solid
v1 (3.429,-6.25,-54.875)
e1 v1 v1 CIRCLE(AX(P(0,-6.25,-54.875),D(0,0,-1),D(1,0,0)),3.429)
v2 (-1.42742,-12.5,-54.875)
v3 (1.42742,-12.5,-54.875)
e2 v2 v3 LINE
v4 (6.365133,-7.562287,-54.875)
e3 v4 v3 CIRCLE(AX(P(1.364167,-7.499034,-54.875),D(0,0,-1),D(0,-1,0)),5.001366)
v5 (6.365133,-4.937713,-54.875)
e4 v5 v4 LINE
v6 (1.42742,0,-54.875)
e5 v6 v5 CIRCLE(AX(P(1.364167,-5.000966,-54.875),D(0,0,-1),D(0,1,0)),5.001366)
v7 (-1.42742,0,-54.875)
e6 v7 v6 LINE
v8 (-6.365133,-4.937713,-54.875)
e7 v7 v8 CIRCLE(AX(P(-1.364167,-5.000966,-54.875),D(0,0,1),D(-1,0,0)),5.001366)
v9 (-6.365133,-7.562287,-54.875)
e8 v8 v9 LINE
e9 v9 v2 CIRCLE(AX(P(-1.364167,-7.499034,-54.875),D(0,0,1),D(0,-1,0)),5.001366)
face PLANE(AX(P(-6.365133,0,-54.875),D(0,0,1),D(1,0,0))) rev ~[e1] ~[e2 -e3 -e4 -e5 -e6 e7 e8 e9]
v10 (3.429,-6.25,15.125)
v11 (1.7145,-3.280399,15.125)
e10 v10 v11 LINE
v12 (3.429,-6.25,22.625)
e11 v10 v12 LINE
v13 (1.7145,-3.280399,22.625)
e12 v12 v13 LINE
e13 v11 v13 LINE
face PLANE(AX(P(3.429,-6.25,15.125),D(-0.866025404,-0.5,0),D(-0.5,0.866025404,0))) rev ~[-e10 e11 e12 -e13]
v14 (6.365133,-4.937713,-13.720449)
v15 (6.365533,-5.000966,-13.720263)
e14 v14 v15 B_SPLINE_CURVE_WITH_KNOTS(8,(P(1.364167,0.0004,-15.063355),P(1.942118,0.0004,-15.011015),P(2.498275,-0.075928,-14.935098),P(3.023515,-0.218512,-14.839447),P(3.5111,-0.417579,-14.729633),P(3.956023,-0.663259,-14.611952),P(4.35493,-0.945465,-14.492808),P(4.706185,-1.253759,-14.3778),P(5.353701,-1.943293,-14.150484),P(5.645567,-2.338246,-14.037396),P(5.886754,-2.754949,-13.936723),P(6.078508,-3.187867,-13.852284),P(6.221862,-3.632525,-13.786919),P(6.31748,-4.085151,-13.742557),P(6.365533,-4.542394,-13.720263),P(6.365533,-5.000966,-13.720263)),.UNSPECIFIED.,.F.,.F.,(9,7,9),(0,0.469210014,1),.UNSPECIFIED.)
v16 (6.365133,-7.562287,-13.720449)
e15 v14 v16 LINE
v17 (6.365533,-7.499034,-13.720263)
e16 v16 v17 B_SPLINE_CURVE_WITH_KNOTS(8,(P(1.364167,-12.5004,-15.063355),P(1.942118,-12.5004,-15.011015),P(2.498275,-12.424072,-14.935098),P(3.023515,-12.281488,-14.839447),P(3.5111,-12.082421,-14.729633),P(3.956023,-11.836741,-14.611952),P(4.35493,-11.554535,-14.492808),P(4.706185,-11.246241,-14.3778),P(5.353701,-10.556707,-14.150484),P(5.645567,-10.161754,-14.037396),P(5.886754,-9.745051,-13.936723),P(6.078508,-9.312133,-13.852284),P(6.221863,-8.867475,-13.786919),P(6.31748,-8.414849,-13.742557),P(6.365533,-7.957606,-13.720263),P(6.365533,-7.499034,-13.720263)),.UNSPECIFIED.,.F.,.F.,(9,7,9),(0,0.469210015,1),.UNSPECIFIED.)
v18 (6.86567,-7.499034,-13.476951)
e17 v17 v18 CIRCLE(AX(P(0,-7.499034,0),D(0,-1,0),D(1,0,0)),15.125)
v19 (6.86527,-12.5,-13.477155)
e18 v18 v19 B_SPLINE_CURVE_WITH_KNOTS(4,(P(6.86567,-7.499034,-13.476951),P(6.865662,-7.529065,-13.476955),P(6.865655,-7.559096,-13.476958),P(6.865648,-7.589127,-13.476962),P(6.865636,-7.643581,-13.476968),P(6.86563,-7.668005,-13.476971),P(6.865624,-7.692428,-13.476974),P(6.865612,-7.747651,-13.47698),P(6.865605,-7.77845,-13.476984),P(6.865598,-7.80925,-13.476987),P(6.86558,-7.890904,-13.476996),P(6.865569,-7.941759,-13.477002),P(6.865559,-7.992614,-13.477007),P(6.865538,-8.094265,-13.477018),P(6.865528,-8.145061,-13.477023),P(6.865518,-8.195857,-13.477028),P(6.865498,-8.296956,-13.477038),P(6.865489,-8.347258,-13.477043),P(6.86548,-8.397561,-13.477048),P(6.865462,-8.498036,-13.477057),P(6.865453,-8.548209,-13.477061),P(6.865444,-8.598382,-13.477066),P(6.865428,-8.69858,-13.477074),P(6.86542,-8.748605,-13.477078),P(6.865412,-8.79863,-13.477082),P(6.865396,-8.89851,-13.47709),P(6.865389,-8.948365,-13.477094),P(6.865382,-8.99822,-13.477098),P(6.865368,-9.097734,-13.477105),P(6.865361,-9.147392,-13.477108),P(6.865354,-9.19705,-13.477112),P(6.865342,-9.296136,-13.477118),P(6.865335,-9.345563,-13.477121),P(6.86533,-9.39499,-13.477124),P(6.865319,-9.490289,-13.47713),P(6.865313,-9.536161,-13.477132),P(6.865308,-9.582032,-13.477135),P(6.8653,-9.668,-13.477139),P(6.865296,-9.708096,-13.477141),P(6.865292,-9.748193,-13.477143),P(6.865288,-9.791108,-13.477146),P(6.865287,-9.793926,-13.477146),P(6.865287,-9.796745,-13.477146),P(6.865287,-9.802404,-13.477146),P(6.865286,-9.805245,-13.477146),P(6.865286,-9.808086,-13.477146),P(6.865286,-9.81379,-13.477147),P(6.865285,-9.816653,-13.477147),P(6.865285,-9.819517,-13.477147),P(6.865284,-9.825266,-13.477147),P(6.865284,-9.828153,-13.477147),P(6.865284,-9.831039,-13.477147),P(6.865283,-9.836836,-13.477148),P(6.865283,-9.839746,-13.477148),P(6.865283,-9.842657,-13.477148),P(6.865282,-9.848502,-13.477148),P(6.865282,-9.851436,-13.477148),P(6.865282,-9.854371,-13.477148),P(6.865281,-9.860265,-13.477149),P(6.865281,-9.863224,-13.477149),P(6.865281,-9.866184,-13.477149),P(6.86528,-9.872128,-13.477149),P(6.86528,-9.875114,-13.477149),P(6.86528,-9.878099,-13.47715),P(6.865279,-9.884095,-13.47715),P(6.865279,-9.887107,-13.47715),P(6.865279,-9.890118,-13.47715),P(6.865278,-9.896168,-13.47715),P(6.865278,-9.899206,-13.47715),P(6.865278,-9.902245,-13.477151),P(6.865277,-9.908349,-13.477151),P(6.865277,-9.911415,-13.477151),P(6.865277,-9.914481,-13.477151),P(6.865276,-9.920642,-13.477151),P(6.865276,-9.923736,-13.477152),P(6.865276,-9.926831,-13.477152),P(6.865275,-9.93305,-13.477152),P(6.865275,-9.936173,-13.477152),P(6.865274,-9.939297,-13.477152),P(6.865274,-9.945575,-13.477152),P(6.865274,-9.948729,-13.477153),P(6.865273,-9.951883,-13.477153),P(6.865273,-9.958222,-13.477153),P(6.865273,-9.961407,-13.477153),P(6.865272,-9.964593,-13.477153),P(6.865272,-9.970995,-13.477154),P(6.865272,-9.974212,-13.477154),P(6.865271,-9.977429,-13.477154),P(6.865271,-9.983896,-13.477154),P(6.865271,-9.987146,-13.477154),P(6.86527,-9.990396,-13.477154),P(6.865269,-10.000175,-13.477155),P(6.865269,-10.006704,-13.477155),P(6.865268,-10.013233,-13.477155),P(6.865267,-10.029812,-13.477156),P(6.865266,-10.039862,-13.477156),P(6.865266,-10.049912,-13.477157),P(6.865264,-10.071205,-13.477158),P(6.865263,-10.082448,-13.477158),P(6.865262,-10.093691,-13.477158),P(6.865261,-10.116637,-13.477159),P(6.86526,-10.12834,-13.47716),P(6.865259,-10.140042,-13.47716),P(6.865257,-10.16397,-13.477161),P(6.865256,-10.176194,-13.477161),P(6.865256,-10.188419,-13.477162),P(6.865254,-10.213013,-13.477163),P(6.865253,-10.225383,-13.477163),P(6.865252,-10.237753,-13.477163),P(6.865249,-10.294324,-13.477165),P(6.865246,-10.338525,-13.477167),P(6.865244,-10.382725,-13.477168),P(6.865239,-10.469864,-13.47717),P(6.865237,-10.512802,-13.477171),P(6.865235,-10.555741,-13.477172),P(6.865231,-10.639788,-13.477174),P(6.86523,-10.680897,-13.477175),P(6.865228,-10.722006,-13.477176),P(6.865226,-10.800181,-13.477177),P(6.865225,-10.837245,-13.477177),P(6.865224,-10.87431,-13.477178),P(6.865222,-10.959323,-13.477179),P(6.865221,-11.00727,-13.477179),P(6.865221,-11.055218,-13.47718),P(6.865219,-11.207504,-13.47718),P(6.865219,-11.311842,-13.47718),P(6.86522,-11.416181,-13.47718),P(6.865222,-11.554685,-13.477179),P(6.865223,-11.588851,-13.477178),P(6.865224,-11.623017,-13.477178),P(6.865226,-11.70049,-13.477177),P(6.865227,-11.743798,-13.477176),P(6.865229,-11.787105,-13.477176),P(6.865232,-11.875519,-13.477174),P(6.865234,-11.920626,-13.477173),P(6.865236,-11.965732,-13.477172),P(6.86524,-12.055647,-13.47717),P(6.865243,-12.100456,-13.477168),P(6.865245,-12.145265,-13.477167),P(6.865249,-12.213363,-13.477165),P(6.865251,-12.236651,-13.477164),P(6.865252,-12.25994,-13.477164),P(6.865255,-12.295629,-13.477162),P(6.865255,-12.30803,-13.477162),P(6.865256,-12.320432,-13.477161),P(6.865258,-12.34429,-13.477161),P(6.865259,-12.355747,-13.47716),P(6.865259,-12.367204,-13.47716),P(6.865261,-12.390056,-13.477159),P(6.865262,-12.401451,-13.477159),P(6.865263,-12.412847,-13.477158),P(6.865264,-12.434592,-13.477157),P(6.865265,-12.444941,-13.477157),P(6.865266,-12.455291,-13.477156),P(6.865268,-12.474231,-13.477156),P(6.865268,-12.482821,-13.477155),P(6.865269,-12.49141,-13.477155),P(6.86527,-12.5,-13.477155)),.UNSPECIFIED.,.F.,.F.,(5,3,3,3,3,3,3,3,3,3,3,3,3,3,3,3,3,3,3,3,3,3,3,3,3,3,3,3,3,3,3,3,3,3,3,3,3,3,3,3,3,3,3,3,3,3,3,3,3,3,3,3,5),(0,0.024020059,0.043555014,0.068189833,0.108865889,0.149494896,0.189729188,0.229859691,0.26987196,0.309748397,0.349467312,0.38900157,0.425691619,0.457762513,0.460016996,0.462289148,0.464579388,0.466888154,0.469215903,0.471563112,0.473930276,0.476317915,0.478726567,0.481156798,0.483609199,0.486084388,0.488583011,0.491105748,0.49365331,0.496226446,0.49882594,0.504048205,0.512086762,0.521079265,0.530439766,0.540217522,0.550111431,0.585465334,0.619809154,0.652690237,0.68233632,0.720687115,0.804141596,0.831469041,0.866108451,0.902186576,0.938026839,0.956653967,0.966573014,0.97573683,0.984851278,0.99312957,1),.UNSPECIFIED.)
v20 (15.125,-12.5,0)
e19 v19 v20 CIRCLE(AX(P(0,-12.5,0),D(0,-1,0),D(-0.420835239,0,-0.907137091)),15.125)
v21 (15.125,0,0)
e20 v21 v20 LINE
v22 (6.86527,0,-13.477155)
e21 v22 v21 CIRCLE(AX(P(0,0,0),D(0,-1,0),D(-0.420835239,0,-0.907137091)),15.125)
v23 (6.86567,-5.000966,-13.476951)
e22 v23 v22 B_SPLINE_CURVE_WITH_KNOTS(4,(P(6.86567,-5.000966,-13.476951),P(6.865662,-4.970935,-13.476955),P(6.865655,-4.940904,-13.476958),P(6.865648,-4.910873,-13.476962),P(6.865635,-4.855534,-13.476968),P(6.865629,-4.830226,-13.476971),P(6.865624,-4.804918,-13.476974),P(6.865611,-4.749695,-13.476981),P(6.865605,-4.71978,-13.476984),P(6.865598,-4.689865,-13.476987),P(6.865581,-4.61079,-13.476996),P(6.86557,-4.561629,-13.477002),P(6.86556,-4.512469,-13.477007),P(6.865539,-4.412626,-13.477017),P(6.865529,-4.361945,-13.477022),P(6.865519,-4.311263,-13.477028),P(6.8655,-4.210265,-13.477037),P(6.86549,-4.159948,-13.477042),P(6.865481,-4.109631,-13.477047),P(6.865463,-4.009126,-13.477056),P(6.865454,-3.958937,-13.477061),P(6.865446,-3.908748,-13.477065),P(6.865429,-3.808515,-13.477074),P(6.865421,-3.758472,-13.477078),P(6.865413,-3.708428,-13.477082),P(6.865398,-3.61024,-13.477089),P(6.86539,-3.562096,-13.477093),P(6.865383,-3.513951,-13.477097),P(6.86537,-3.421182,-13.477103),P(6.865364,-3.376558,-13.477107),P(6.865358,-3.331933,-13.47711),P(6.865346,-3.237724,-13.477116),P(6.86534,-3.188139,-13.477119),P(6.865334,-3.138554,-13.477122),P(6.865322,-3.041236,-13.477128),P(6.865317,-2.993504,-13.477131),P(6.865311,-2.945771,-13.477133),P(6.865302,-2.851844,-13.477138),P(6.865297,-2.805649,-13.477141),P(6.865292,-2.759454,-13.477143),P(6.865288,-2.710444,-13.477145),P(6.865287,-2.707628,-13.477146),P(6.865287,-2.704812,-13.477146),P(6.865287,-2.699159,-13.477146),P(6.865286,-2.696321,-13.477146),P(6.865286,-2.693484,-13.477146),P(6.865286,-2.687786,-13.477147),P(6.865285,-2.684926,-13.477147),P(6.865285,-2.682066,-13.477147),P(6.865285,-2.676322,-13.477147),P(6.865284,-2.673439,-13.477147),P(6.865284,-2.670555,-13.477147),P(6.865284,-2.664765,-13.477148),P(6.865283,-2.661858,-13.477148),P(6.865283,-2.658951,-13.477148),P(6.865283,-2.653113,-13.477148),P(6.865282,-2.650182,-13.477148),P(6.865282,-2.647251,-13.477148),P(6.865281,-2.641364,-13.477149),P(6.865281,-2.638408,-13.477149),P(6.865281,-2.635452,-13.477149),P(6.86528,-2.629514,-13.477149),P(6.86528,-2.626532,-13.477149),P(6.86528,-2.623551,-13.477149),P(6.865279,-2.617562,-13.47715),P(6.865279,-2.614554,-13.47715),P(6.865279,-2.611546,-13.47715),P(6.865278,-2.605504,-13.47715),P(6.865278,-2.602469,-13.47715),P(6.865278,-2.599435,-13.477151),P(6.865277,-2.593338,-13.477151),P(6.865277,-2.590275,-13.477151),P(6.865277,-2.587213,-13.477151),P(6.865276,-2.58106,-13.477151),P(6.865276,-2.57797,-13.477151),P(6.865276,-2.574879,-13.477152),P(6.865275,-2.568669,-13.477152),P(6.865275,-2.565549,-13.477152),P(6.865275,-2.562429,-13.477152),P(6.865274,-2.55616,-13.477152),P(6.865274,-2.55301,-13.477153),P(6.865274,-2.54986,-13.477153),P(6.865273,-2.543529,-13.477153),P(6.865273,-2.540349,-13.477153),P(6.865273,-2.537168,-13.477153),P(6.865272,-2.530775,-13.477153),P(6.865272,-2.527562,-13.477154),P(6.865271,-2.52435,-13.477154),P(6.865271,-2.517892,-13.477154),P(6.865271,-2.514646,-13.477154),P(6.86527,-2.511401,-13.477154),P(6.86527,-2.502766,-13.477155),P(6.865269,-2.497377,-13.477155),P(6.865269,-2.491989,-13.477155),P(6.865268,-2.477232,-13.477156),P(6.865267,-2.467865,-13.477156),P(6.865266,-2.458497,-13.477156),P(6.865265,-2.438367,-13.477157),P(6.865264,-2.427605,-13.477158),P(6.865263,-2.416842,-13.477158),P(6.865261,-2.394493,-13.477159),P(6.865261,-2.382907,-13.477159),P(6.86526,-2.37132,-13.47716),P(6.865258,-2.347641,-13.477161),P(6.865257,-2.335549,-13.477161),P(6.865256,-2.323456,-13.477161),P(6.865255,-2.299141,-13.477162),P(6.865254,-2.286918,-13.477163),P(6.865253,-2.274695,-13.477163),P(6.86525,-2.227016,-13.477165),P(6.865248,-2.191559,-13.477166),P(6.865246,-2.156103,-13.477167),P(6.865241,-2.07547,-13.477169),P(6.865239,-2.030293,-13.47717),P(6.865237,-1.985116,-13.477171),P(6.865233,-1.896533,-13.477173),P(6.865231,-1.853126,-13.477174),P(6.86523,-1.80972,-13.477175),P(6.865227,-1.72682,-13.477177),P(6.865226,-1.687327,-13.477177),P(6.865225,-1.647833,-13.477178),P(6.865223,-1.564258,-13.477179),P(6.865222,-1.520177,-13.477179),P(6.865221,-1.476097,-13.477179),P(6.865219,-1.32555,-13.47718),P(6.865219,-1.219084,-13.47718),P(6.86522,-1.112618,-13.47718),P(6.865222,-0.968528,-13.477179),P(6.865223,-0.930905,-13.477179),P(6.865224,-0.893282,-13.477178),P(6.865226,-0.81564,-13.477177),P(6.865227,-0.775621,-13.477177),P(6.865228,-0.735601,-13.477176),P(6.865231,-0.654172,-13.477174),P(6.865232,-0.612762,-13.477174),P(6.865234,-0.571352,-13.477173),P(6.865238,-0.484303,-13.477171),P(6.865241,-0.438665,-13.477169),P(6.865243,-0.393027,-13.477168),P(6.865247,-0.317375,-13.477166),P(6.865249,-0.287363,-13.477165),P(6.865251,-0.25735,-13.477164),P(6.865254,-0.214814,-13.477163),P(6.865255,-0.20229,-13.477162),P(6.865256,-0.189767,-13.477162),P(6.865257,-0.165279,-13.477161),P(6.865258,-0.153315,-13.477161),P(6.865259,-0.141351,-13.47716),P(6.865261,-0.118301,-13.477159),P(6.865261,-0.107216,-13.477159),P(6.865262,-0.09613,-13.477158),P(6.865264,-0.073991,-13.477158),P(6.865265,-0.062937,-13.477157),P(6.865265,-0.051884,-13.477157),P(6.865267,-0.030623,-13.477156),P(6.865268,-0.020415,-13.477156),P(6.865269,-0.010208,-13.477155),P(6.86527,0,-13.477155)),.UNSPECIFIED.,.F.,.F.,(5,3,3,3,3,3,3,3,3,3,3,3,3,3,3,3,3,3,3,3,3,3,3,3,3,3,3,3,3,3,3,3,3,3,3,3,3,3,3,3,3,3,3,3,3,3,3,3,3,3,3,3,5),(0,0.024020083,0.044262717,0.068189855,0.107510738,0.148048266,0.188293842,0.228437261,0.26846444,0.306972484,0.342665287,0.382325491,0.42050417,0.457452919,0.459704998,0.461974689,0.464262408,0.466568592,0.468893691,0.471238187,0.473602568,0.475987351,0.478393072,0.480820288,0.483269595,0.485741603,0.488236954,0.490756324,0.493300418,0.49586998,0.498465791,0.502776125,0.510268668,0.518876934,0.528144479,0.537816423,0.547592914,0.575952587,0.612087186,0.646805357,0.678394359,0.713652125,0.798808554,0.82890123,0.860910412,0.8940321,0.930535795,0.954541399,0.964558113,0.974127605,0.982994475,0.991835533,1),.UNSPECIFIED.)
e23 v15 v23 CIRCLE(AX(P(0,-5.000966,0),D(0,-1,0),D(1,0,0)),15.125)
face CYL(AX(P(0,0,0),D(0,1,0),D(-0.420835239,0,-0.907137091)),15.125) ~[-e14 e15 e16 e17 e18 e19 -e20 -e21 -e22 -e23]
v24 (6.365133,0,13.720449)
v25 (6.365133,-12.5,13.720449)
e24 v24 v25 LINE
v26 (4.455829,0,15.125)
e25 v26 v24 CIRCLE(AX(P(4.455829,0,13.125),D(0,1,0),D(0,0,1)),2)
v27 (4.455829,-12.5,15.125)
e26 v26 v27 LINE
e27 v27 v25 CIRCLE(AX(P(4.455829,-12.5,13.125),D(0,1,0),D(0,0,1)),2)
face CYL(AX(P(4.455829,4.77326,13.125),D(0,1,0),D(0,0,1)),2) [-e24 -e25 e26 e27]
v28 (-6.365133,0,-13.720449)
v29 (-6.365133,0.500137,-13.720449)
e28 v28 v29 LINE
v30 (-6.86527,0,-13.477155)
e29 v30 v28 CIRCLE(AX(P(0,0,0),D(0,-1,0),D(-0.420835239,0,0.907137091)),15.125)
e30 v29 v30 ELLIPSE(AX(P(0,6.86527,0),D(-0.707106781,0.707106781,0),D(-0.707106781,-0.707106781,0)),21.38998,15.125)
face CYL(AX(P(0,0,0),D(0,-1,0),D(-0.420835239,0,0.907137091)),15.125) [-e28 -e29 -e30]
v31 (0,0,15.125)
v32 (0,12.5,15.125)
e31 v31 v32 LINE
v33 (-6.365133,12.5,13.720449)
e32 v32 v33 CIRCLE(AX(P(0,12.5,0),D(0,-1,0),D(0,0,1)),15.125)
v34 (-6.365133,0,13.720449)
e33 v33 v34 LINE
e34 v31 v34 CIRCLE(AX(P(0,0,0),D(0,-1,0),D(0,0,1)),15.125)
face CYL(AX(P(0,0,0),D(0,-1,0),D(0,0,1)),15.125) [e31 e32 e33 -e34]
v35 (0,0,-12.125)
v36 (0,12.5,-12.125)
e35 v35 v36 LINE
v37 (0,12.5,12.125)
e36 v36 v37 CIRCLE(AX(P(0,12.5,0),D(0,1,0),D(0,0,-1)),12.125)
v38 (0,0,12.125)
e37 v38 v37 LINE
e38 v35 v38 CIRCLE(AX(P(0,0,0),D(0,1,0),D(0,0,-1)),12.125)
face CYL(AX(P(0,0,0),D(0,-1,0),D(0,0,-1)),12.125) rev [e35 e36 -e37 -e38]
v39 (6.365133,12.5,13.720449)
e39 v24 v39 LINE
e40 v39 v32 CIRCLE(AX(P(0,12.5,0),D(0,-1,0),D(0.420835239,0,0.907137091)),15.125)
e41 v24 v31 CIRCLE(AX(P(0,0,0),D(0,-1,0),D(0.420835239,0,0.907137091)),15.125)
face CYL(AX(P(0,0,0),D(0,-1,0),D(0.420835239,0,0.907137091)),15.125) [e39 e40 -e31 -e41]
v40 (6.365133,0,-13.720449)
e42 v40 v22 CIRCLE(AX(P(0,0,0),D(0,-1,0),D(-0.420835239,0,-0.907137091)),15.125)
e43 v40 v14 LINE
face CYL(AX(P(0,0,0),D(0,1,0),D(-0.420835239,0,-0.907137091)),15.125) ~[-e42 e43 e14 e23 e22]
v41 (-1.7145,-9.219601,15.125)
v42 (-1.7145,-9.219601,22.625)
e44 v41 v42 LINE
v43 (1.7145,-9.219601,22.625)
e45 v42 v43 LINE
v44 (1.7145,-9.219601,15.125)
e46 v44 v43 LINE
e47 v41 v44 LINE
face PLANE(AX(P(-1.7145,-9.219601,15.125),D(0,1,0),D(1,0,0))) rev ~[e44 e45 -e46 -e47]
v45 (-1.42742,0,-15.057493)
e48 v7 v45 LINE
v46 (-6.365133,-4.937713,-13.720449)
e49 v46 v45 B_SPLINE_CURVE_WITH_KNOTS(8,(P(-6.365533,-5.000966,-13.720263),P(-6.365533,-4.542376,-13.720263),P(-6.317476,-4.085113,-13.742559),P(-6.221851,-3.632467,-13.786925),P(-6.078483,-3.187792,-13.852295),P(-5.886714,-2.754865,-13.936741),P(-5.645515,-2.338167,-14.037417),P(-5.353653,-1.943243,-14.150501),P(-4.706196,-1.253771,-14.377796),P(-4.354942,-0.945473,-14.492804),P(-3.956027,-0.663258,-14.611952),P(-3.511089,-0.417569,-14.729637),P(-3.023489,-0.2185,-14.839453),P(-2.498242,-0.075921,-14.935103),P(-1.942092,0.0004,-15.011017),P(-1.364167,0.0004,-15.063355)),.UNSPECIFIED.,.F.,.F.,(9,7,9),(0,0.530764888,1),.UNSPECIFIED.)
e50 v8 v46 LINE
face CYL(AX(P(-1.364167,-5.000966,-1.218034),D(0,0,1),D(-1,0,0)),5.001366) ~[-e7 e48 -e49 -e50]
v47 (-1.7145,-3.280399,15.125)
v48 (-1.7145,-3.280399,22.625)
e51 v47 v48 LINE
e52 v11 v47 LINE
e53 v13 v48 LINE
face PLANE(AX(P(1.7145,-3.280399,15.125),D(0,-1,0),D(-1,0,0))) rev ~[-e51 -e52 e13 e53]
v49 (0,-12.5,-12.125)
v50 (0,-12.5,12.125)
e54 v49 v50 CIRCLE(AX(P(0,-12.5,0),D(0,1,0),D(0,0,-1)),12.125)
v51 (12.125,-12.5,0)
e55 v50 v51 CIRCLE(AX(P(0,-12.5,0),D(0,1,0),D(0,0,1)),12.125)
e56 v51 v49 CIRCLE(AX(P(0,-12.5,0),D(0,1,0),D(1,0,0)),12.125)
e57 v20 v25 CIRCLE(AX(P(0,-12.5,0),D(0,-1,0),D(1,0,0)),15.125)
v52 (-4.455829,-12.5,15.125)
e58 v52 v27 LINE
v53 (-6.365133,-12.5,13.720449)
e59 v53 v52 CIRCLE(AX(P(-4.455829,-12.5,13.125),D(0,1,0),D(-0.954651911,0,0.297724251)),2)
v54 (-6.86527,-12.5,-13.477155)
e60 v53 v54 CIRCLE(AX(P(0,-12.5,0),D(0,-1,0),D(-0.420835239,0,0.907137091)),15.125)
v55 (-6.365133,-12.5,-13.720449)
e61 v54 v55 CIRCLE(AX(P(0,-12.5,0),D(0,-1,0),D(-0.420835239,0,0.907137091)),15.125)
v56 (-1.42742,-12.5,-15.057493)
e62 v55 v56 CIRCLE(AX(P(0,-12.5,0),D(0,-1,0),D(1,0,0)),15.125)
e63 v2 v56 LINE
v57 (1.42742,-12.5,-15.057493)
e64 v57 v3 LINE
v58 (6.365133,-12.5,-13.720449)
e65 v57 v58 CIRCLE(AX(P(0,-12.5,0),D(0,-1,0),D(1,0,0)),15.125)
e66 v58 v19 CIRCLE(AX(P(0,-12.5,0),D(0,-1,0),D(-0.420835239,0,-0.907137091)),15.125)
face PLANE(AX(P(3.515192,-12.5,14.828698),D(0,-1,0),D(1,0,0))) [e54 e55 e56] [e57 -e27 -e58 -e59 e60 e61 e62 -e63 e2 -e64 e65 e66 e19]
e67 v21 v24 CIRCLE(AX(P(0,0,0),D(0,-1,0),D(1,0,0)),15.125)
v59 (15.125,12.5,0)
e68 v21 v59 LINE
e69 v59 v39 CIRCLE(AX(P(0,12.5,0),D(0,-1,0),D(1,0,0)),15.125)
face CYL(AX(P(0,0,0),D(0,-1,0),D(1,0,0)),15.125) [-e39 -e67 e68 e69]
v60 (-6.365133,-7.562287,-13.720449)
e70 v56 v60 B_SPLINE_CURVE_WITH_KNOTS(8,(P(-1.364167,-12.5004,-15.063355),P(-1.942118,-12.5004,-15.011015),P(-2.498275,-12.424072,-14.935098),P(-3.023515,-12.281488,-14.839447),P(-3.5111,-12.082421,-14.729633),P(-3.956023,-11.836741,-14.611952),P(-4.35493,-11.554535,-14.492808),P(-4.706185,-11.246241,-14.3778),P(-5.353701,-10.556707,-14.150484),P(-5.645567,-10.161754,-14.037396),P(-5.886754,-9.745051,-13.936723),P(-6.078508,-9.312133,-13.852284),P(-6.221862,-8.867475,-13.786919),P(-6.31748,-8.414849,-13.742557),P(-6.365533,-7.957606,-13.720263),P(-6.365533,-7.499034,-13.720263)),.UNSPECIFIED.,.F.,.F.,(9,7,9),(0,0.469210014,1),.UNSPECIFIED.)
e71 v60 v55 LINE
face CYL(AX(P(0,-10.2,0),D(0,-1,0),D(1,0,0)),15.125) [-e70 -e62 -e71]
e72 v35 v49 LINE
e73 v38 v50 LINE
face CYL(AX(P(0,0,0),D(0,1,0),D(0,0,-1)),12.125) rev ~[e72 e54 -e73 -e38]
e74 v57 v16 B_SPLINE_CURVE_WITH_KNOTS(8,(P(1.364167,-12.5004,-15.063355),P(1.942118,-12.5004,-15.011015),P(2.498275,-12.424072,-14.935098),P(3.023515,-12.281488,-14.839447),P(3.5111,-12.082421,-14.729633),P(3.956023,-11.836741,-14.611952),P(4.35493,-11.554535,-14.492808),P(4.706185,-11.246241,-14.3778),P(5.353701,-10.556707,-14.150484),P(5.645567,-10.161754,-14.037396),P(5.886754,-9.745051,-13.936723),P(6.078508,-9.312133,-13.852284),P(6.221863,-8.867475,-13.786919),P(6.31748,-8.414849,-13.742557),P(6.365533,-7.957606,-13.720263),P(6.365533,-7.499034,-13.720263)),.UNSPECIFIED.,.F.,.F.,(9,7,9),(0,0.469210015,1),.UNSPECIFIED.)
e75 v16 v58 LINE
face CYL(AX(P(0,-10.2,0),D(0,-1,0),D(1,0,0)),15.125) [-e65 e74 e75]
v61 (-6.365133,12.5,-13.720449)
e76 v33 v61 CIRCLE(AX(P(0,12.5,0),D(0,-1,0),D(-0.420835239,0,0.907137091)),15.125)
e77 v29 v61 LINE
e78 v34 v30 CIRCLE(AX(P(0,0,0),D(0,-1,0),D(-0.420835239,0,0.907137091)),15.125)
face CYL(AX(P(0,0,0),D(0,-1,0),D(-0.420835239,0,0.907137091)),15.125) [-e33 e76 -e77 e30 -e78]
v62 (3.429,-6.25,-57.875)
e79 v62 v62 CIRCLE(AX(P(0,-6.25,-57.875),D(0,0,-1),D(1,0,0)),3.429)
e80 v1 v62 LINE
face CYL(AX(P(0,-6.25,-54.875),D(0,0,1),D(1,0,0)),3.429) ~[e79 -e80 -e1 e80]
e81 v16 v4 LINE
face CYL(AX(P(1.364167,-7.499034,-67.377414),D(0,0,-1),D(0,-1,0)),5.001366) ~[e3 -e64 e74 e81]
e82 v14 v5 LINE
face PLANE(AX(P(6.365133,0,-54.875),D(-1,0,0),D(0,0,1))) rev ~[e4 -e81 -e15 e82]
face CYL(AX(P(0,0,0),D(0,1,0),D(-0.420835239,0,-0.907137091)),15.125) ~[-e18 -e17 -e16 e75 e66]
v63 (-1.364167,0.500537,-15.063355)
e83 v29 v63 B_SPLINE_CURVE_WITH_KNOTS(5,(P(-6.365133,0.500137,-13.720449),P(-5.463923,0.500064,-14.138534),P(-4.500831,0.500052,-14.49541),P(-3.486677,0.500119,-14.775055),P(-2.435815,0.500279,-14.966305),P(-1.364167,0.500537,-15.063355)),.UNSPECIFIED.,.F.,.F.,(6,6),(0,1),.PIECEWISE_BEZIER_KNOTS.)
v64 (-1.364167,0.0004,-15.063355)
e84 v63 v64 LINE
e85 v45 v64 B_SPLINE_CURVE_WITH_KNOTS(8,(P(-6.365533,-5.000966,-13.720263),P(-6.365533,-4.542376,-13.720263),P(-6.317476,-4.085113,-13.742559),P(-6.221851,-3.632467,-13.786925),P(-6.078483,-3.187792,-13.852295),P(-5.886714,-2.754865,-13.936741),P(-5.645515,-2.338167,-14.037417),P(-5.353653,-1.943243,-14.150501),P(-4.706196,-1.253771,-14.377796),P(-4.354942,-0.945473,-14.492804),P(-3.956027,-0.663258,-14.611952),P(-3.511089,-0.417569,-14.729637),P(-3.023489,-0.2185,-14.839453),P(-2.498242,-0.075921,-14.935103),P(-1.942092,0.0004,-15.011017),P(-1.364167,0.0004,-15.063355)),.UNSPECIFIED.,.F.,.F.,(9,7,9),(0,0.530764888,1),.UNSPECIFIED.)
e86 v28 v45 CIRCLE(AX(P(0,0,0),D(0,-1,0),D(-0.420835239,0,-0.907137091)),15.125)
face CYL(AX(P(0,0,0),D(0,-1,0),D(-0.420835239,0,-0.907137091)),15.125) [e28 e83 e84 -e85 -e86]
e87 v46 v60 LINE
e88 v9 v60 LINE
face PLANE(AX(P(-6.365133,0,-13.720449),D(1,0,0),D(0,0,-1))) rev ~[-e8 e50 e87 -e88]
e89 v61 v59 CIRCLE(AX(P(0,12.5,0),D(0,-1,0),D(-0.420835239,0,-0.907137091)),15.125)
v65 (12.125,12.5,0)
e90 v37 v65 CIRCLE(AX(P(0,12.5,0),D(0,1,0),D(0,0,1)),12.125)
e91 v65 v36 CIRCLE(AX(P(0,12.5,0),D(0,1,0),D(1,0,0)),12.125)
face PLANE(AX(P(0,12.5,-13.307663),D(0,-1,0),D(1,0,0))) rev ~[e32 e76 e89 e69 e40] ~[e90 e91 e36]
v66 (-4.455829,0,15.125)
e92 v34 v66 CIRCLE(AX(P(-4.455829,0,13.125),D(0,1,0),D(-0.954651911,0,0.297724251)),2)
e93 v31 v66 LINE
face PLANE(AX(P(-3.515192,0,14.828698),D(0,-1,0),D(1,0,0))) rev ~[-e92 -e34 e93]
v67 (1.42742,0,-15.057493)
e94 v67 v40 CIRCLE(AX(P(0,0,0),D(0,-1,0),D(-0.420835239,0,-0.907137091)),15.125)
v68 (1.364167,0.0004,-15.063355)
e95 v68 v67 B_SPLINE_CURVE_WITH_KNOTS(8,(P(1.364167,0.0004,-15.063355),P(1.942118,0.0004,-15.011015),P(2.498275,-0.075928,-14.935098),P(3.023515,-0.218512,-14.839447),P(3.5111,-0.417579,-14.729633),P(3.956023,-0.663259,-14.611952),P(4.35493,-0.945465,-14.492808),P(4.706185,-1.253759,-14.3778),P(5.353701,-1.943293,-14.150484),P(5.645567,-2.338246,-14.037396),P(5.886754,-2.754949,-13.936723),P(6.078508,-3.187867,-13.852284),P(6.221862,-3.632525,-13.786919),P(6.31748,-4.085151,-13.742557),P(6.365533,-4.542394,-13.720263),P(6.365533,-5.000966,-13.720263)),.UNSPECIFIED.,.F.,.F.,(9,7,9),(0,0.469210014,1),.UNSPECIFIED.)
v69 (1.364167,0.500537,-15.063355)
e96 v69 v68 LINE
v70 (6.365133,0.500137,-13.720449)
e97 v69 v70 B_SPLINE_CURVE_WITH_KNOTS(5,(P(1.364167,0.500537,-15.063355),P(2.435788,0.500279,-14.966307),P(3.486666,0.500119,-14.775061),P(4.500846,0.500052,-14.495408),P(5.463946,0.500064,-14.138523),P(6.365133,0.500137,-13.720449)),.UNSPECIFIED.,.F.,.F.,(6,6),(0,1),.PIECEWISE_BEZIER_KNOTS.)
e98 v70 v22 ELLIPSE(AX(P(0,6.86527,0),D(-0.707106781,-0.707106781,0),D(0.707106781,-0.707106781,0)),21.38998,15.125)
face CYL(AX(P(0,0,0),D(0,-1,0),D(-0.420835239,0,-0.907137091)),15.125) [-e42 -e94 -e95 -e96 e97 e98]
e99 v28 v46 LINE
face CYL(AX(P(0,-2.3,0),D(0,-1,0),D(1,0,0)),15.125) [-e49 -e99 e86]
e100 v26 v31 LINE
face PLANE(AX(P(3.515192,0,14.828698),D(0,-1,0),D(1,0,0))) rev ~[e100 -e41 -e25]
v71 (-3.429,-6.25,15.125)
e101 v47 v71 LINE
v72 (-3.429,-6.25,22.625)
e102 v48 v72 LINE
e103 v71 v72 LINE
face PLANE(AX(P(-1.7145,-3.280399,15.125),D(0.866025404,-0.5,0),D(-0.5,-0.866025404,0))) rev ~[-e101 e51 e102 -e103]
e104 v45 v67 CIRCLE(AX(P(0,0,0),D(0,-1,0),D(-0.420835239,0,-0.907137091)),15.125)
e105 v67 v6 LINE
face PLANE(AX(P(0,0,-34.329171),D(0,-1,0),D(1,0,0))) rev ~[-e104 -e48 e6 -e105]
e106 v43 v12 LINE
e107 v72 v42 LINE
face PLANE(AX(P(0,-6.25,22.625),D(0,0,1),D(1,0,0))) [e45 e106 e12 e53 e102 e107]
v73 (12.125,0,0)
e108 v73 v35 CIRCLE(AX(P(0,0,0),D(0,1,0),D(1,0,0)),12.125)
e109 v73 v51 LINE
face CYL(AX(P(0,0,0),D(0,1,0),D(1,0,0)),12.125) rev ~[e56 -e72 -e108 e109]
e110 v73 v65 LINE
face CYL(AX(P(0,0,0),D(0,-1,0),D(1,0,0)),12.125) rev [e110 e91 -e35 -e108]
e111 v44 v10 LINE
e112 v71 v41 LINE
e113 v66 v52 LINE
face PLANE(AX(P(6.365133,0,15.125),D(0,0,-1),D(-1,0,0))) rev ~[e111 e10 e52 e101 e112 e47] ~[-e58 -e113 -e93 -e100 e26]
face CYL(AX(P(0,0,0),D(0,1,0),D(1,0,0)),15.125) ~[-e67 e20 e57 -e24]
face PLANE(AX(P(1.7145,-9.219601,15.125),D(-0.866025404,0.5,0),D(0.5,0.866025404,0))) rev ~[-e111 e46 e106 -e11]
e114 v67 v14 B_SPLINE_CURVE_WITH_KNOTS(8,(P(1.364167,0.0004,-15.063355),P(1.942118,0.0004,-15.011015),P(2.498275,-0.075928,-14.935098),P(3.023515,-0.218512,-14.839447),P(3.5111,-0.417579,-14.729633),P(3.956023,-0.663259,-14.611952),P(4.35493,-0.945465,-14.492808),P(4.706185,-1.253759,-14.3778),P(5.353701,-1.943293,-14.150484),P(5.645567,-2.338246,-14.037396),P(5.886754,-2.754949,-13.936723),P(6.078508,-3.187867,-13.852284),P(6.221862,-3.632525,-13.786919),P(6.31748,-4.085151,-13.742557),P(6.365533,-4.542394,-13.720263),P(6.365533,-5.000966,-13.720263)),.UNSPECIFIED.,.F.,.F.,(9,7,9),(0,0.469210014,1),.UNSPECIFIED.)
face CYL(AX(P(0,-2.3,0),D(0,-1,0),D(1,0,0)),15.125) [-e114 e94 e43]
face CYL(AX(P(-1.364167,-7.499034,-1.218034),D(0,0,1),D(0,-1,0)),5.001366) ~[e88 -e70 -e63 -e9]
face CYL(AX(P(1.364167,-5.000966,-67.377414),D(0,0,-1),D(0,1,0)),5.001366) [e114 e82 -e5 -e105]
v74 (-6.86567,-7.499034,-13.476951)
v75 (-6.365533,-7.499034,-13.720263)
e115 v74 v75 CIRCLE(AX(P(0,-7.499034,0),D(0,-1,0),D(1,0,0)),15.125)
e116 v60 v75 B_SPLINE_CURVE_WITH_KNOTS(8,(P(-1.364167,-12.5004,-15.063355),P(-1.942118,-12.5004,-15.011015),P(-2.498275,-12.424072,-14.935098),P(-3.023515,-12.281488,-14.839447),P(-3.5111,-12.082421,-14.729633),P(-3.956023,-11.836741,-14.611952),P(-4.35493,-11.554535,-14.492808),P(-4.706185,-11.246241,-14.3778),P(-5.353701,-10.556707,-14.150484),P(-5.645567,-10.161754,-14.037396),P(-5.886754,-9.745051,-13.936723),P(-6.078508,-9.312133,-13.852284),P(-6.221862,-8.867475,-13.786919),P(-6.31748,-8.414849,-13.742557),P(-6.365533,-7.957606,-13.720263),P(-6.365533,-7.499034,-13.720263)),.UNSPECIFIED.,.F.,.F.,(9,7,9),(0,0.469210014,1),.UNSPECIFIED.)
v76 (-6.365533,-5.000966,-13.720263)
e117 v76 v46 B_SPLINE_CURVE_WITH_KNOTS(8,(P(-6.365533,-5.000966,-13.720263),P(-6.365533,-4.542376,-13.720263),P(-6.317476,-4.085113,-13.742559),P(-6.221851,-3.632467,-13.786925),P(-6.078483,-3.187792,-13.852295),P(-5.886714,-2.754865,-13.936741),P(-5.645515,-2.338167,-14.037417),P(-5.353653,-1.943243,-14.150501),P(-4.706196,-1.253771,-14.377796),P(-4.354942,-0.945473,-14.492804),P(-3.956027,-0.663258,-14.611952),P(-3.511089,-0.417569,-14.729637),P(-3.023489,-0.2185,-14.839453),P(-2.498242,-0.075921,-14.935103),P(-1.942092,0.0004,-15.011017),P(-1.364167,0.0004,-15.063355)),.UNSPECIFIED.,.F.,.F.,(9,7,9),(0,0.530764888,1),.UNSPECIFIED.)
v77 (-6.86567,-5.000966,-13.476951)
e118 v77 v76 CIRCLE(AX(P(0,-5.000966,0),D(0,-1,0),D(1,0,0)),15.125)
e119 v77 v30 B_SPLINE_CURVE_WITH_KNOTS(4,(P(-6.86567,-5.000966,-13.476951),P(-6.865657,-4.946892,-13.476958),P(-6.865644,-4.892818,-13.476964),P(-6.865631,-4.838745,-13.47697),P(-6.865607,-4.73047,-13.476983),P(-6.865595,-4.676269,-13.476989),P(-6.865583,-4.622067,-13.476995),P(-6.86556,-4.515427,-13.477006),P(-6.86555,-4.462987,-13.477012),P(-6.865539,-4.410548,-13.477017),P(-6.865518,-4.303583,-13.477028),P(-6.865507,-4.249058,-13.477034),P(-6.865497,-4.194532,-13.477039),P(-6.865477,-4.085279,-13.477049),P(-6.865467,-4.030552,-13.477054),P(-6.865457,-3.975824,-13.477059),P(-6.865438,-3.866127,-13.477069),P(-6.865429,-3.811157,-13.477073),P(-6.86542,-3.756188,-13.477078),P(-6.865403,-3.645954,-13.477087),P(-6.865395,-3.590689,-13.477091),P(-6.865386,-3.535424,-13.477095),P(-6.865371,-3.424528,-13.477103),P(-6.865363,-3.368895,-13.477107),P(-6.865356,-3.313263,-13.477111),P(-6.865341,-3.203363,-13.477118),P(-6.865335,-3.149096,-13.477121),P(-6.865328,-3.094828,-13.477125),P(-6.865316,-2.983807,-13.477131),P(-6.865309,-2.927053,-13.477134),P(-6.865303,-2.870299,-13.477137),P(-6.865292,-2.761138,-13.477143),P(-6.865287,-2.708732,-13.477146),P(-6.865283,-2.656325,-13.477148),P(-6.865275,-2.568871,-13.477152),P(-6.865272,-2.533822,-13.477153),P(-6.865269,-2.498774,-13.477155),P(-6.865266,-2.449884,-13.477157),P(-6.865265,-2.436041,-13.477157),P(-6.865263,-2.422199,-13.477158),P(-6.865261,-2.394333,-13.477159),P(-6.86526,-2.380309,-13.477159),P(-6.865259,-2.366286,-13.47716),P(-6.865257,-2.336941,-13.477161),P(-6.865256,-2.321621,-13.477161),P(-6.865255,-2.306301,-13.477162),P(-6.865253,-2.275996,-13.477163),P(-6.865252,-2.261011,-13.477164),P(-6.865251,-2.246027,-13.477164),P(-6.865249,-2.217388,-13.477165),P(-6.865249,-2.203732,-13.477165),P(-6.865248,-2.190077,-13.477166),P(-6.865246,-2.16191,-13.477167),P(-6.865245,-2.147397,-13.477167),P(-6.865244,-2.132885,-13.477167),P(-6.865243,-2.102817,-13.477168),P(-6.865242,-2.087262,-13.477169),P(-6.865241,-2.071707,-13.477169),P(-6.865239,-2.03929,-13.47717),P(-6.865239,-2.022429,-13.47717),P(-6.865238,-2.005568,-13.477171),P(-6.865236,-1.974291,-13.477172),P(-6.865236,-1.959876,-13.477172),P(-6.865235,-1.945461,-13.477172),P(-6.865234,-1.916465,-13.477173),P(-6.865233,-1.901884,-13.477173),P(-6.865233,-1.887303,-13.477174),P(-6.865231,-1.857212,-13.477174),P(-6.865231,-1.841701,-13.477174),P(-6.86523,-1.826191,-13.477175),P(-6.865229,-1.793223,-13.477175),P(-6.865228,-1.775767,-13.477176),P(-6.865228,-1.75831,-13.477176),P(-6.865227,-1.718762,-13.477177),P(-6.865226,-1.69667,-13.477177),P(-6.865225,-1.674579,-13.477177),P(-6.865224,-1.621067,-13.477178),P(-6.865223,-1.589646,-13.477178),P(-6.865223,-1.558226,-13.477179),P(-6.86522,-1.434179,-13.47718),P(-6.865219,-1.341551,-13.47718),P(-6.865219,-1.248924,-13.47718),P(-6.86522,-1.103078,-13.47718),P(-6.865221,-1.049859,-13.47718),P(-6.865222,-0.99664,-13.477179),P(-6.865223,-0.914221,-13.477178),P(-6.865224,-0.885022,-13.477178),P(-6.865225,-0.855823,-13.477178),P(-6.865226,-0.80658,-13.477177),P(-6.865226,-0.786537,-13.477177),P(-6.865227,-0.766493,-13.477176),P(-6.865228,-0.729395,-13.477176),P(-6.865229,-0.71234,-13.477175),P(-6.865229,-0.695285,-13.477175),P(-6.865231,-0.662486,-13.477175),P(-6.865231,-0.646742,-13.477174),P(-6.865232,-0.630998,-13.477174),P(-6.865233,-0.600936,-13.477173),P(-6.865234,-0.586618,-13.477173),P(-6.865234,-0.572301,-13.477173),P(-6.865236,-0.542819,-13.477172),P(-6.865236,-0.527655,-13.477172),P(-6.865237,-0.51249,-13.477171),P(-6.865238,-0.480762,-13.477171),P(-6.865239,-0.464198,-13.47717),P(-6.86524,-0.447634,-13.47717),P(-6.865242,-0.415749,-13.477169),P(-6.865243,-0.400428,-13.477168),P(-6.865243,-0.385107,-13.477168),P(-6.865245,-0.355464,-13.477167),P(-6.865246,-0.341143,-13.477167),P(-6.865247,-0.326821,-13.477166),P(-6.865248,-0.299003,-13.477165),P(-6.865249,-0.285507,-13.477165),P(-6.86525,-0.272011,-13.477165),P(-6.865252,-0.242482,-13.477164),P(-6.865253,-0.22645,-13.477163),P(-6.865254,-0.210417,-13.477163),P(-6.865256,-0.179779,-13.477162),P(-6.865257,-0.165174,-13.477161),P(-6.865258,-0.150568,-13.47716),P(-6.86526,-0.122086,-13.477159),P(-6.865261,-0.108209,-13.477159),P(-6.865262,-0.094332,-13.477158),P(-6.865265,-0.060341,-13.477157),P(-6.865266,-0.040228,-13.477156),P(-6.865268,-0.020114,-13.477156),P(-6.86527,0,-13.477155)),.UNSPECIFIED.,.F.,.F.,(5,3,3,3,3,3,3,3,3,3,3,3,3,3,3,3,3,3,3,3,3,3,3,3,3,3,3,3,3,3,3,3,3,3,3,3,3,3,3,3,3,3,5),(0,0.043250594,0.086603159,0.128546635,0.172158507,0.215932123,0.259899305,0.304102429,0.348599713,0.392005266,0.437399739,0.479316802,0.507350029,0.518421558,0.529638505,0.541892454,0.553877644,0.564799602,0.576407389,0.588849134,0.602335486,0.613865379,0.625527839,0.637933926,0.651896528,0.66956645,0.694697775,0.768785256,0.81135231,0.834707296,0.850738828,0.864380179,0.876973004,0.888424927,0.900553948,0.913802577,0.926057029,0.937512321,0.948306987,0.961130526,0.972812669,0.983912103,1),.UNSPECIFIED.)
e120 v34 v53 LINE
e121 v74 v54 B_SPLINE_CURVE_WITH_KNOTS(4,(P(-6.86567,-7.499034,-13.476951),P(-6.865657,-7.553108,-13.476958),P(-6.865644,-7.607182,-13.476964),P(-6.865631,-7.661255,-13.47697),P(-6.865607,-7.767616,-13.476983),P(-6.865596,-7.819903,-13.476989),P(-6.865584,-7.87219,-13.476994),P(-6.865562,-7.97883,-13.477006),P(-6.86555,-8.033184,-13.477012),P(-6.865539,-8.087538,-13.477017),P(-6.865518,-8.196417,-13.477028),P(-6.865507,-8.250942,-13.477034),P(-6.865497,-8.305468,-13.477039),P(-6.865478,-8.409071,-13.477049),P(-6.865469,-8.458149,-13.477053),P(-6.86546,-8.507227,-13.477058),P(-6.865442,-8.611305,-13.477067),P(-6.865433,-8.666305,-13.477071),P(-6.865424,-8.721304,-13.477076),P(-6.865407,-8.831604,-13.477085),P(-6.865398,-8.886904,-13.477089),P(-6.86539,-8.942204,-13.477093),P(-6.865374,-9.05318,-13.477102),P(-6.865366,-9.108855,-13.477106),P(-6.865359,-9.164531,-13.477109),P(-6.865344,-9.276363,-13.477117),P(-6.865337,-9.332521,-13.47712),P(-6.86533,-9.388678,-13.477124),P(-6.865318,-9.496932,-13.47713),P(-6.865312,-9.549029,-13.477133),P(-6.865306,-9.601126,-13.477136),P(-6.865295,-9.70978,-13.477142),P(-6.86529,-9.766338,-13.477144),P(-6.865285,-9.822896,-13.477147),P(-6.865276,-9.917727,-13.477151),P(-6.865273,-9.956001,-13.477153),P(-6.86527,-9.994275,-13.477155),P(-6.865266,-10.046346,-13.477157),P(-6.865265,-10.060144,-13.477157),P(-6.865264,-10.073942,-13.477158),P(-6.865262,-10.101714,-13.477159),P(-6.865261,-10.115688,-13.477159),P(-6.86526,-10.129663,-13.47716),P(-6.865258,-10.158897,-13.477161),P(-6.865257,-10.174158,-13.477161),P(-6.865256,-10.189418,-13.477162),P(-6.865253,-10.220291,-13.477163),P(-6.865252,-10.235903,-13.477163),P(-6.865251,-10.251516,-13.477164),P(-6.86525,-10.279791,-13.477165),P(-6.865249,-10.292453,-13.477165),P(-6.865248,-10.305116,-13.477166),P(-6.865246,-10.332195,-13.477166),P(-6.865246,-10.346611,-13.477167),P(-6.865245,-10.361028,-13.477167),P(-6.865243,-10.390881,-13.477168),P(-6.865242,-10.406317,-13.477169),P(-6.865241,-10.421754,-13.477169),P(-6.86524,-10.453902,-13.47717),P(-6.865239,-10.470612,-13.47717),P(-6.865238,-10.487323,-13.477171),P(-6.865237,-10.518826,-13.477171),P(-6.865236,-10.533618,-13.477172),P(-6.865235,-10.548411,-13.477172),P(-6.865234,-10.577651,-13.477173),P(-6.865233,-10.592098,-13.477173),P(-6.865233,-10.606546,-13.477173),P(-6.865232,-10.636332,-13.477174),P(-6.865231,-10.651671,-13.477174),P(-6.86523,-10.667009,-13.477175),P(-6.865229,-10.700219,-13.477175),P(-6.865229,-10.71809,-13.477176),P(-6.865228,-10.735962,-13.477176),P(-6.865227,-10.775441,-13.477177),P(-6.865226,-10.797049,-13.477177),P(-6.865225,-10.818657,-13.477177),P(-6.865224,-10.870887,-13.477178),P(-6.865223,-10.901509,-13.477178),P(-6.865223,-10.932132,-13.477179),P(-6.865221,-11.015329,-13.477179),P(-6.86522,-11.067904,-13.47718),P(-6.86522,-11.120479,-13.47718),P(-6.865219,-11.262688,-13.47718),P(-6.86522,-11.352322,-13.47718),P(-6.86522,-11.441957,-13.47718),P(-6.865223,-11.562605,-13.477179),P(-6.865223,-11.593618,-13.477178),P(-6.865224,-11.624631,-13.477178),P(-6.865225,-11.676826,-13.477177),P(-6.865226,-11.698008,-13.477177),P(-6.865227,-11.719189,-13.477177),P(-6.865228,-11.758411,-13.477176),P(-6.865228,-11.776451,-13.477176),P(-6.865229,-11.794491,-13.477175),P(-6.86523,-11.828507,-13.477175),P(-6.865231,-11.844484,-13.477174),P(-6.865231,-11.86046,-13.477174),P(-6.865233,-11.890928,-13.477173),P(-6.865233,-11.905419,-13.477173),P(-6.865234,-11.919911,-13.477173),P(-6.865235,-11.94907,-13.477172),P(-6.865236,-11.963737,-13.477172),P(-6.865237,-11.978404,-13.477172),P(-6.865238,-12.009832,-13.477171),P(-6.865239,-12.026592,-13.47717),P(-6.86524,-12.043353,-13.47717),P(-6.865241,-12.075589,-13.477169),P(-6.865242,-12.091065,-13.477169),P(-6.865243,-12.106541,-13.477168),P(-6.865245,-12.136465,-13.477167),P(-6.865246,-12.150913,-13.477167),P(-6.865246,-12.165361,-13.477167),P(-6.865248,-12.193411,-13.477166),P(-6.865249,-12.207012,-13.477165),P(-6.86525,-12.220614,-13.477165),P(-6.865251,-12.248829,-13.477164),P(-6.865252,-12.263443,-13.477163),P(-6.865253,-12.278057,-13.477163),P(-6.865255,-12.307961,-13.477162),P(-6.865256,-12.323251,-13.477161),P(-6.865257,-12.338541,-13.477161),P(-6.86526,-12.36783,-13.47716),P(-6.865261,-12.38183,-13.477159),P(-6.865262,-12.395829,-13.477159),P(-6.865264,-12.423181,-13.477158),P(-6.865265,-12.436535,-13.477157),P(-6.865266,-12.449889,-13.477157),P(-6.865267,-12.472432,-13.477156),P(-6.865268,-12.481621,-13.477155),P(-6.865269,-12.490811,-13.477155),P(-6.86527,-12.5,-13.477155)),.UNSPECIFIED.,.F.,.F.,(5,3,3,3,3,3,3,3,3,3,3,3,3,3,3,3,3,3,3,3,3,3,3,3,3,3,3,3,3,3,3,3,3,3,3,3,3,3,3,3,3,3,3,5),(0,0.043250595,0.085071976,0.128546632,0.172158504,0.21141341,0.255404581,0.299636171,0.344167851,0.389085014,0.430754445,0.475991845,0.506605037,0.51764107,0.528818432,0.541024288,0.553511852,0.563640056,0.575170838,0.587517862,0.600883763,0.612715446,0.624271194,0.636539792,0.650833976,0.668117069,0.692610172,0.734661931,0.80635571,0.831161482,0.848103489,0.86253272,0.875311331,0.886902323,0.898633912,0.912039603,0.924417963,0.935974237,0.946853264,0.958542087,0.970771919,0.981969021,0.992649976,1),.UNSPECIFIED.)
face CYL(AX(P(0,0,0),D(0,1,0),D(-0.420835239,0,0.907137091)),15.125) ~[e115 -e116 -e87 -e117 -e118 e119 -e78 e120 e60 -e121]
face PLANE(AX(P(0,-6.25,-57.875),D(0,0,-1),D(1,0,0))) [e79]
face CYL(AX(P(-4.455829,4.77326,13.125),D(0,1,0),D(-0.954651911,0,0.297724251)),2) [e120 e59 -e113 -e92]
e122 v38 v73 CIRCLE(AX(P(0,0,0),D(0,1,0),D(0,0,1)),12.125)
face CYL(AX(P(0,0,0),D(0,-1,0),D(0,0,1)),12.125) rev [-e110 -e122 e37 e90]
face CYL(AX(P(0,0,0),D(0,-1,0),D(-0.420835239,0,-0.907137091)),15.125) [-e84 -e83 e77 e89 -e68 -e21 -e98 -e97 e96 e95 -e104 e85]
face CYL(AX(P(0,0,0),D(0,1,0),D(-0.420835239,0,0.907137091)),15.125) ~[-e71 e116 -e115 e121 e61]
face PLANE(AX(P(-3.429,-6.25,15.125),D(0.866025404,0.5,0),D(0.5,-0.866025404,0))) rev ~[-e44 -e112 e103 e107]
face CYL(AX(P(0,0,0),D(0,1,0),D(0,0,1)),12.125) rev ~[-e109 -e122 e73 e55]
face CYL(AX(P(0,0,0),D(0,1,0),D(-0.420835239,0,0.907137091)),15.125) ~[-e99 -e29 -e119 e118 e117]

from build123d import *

# Parameters (mm, degrees)
F1_DEPTH     = 12.5
F2_DEPTH     = 12.5
F3_DEPTH     = 12.5
F6_DEPTH     = 7.5
F5_R         = 3.429
F7_DEPTH     = 3
F8_T4_DEPTH  = 66.159380005
F8_S5_R      = 15.125
F8_T6_DEPTH  = 35
F8_T10_DEPTH = 66.159380005
F8_S11_R     = 15.125
F8_T12_DEPTH = 35
F8_T16_DEPTH = 66.159380005
F8_S17_R     = 15.125
F8_T18_DEPTH = 35
F8_T22_DEPTH = 66.159380005
F8_S23_R     = 15.125
F8_T24_DEPTH = 35
F9_T1_DEPTH  = 22.0465191056


# Not quite as in the source:
# - a fillet or chamfer that OpenCascade refuses, or shapes differently, is made with other operations: its cross-section is extruded or revolved along the edge and cut away or added


with BuildPart() as f1:
    # F0 (on Front) → F1 (new body, symmetric)
    with BuildSketch(Plane.XZ):
        with BuildLine():
            Line((-6.3651329838, -12.125), (-6.3651329838, -13.7204485021))
            ThreePointArc((-6.3651329838, -13.7204485021), (0, -15.125), (6.3651329838, -13.7204485021))
            Line((6.3651329838, -13.7204485021), (6.3651329838, -12.125))
            Line((6.3651329838, -12.125), (0, -12.125))
            Line((0, -12.125), (-6.3651329838, -12.125))
        make_face()
        with BuildLine():
            ThreePointArc((6.3651329838, 13.7204485021), (3.2591288258, 14.7696887001), (0, 15.125))
            ThreePointArc((0, 15.125), (-3.2591288258, 14.7696887001), (-6.3651329838, 13.7204485021))
            Line((-6.3651329838, 13.7204485021), (-6.3651329838, 12.125))
            Line((-6.3651329838, 12.125), (0, 12.125))
            Line((0, 12.125), (6.3651329838, 12.125))
            Line((6.3651329838, 12.125), (6.3651329838, 13.7204485021))
        make_face()
        with BuildLine():
            ThreePointArc((15.125, 0), (12.7482991293, 8.1391949424), (6.3651329838, 13.7204485021))
            Line((6.3651329838, 13.7204485021), (6.3651329838, 12.125))
            Line((6.3651329838, 12.125), (0, 12.125))
            ThreePointArc((0, 12.125), (8.5736697219, 8.5736697219), (12.125, 0))
            ThreePointArc((12.125, 0), (8.5736697219, -8.5736697219), (0, -12.125))
            Line((0, -12.125), (6.3651329838, -12.125))
            Line((6.3651329838, -12.125), (6.3651329838, -13.7204485021))
            ThreePointArc((6.3651329838, -13.7204485021), (12.7482991293, -8.1391949424), (15.125, 0))
        make_face()
        with BuildLine():
            Line((-6.3651329838, 12.125), (-6.3651329838, 13.7204485021))
            ThreePointArc((-6.3651329838, 13.7204485021), (-15.125, 0), (-6.3651329838, -13.7204485021))
            Line((-6.3651329838, -13.7204485021), (-6.3651329838, -12.125))
            Line((-6.3651329838, -12.125), (0, -12.125))
            ThreePointArc((0, -12.125), (-12.125, 0), (0, 12.125))
            Line((0, 12.125), (-6.3651329838, 12.125))
        make_face()
    extrude(amount=F1_DEPTH, both=True)

    # F0 (on Front) → F2 (join, through all)
    with BuildSketch(Plane.XZ):
        with BuildLine():
            ThreePointArc((6.3651329838, -13.7204485021), (0, -15.125), (-6.3651329838, -13.7204485021))
            Line((-6.3651329838, -13.7204485021), (-6.3651329838, -54.875))
            Line((-6.3651329838, -54.875), (6.3651329838, -54.875))
            Line((6.3651329838, -54.875), (6.3651329838, -13.7204485021))
        make_face()
    extrude(amount=F2_DEPTH)

    # F0 (on Front) → F3 (join, through all)
    with BuildSketch(Plane.XZ):
        with BuildLine():
            Line((6.3651329838, 15.125), (0, 15.125))
            ThreePointArc((0, 15.125), (3.2591288258, 14.7696887001), (6.3651329838, 13.7204485021))
            Line((6.3651329838, 13.7204485021), (6.3651329838, 15.125))
        make_face()
        with BuildLine():
            Line((0, 15.125), (-6.3651329838, 15.125))
            Line((-6.3651329838, 15.125), (-6.3651329838, 13.7204485021))
            ThreePointArc((-6.3651329838, 13.7204485021), (-3.2591288258, 14.7696887001), (0, 15.125))
        make_face()
    extrude(amount=F3_DEPTH)

    # F4 (on face) → F6 (join)
    with BuildSketch(Plane.XY.offset(15.125)):
        Polygon((1.7145000001, -9.2196011096), (3.4290000001, -6.25), (1.7144999999, -3.2803988905), (-1.7145, -3.2803988907), (-3.4289999999, -6.25), (-1.7145000001, -9.2196011096), align=None)
    extrude(amount=F6_DEPTH)

    # F5 (on face) → F7 (join)
    with BuildSketch(Plane(origin=(0, 0, -54.875), x_dir=(1, 0, 0), z_dir=(0, 0, -1))):
        with Locations((0, 6.2500000003)):
            Circle(F5_R)
    extrude(amount=F7_DEPTH)

    # F8: fillet of radius 5 on 6 edges, made by hand


with BuildPart() as f8_tool2:
    # F8_s3 → F8_t4 (new body)
    with BuildSketch(Plane.XY.offset(-67.3774142536)):
        with BuildLine():
            ThreePointArc((1.3641672983, 0.0004), (4.9006668897, -1.4644660941), (6.3655329838, -5.0009656854))
            Line((6.3655329838, -5.0009656854), (6.8656695523, -5.0009656854))
            ThreePointArc((6.8656695523, -5.0009656854), (6.8652695523, -2.5004828427), (6.8652695523, 0))
            Line((6.8652695523, 0), (6.3651329838, 0.5001365685))
            ThreePointArc((6.3651329838, 0.5001365685), (3.8646501411, 0.5001365685), (1.3641672983, 0.5005365685))
            Line((1.3641672983, 0.5005365685), (1.3641672983, 0.0004))
        make_face()
    extrude(amount=F8_T4_DEPTH)

    # F8_s5 → F8_t6 (cut, symmetric)
    with BuildSketch(Plane.XZ.offset(2.3)):
        Circle(F8_S5_R)
    extrude(amount=F8_T6_DEPTH, both=True, mode=Mode.SUBTRACT)


with BuildPart() as f1_1:
    add(f1.part)

    # F8_t1: cut F8_tool2
    add(f8_tool2.part, mode=Mode.SUBTRACT)


with BuildPart() as f8_tool8:
    # F8_s9 → F8_t10 (new body)
    with BuildSketch(Plane.XY.offset(-1.2180342485)):
        with BuildLine():
            ThreePointArc((-6.3655329838, -5.0009656854), (-4.9006668897, -1.4644660941), (-1.3641672983, 0.0004))
            Line((-1.3641672983, 0.0004), (-1.3641672983, 0.5005365685))
            ThreePointArc((-1.3641672983, 0.5005365685), (-3.8646501411, 0.5001365685), (-6.3651329838, 0.5001365685))
            Line((-6.3651329838, 0.5001365685), (-6.8652695523, 0))
            ThreePointArc((-6.8652695523, 0), (-6.8652695523, -2.5004828427), (-6.8656695523, -5.0009656854))
            Line((-6.8656695523, -5.0009656854), (-6.3655329838, -5.0009656854))
        make_face()
    extrude(amount=-F8_T10_DEPTH)

    # F8_s11 → F8_t12 (cut, symmetric)
    with BuildSketch(Plane.XZ.offset(2.3)):
        Circle(F8_S11_R)
    extrude(amount=F8_T12_DEPTH, both=True, mode=Mode.SUBTRACT)


with BuildPart() as f1_2:
    add(f1_1.part)

    # F8_t7: cut F8_tool8
    add(f8_tool8.part, mode=Mode.SUBTRACT)


with BuildPart() as f8_tool14:
    # F8_s15 → F8_t16 (new body)
    with BuildSketch(Plane.XY.offset(-67.3774142536)):
        with BuildLine():
            ThreePointArc((1.3641672983, -12.5004), (4.9006668897, -11.0355339059), (6.3655329838, -7.4990343146))
            Line((6.3655329838, -7.4990343146), (6.8656695523, -7.4990343146))
            ThreePointArc((6.8656695523, -7.4990343146), (6.8652695523, -9.9995171573), (6.8652695523, -12.5))
            Line((6.8652695523, -12.5), (6.3651329838, -13.0001365685))
            ThreePointArc((6.3651329838, -13.0001365685), (3.8646501411, -13.0001365685), (1.3641672983, -13.0005365685))
            Line((1.3641672983, -13.0005365685), (1.3641672983, -12.5004))
        make_face()
    extrude(amount=F8_T16_DEPTH)

    # F8_s17 → F8_t18 (cut, symmetric)
    with BuildSketch(Plane.XZ.offset(10.2)):
        Circle(F8_S17_R)
    extrude(amount=F8_T18_DEPTH, both=True, mode=Mode.SUBTRACT)


with BuildPart() as f1_3:
    add(f1_2.part)

    # F8_t13: cut F8_tool14
    add(f8_tool14.part, mode=Mode.SUBTRACT)


with BuildPart() as f8_tool20:
    # F8_s21 → F8_t22 (new body)
    with BuildSketch(Plane.XY.offset(-1.2180342485)):
        with BuildLine():
            ThreePointArc((-1.3641672983, -12.5004), (-4.9006668897, -11.0355339059), (-6.3655329838, -7.4990343146))
            Line((-6.3655329838, -7.4990343146), (-6.8656695523, -7.4990343146))
            ThreePointArc((-6.8656695523, -7.4990343146), (-6.8652695523, -9.9995171573), (-6.8652695523, -12.5))
            Line((-6.8652695523, -12.5), (-6.3651329838, -13.0001365685))
            ThreePointArc((-6.3651329838, -13.0001365685), (-3.8646501411, -13.0001365685), (-1.3641672983, -13.0005365685))
            Line((-1.3641672983, -13.0005365685), (-1.3641672983, -12.5004))
        make_face()
    extrude(amount=-F8_T22_DEPTH)

    # F8_s23 → F8_t24 (cut, symmetric)
    with BuildSketch(Plane.XZ.offset(10.2)):
        Circle(F8_S23_R)
    extrude(amount=F8_T24_DEPTH, both=True, mode=Mode.SUBTRACT)


with BuildPart() as f1_4:
    add(f1_3.part)

    # F8_t19: cut F8_tool20
    add(f8_tool20.part, mode=Mode.SUBTRACT)

    # F9: fillet of radius 2 on 2 edges, made by hand

    # F9_s2 → F9_t1 (cut)
    with BuildSketch(Plane.XZ.offset(-4.7732595528)):
        with BuildLine():
            ThreePointArc((-6.3651329838, 13.7204485021), (-5.6409669175, 14.7360395719), (-4.4558291627, 15.125))
            Line((-4.4558291627, 15.125), (-6.3651329838, 15.125))
            Line((-6.3651329838, 15.125), (-6.3651329838, 13.7204485021))
        make_face()
        with BuildLine():
            ThreePointArc((4.4558291627, 15.125), (5.6409669175, 14.7360395719), (6.3651329838, 13.7204485021))
            Line((6.3651329838, 13.7204485021), (6.3651329838, 15.125))
            Line((6.3651329838, 15.125), (4.4558291627, 15.125))
        make_face()
    extrude(amount=F9_T1_DEPTH, mode=Mode.SUBTRACT)


solid = f1_4.part
